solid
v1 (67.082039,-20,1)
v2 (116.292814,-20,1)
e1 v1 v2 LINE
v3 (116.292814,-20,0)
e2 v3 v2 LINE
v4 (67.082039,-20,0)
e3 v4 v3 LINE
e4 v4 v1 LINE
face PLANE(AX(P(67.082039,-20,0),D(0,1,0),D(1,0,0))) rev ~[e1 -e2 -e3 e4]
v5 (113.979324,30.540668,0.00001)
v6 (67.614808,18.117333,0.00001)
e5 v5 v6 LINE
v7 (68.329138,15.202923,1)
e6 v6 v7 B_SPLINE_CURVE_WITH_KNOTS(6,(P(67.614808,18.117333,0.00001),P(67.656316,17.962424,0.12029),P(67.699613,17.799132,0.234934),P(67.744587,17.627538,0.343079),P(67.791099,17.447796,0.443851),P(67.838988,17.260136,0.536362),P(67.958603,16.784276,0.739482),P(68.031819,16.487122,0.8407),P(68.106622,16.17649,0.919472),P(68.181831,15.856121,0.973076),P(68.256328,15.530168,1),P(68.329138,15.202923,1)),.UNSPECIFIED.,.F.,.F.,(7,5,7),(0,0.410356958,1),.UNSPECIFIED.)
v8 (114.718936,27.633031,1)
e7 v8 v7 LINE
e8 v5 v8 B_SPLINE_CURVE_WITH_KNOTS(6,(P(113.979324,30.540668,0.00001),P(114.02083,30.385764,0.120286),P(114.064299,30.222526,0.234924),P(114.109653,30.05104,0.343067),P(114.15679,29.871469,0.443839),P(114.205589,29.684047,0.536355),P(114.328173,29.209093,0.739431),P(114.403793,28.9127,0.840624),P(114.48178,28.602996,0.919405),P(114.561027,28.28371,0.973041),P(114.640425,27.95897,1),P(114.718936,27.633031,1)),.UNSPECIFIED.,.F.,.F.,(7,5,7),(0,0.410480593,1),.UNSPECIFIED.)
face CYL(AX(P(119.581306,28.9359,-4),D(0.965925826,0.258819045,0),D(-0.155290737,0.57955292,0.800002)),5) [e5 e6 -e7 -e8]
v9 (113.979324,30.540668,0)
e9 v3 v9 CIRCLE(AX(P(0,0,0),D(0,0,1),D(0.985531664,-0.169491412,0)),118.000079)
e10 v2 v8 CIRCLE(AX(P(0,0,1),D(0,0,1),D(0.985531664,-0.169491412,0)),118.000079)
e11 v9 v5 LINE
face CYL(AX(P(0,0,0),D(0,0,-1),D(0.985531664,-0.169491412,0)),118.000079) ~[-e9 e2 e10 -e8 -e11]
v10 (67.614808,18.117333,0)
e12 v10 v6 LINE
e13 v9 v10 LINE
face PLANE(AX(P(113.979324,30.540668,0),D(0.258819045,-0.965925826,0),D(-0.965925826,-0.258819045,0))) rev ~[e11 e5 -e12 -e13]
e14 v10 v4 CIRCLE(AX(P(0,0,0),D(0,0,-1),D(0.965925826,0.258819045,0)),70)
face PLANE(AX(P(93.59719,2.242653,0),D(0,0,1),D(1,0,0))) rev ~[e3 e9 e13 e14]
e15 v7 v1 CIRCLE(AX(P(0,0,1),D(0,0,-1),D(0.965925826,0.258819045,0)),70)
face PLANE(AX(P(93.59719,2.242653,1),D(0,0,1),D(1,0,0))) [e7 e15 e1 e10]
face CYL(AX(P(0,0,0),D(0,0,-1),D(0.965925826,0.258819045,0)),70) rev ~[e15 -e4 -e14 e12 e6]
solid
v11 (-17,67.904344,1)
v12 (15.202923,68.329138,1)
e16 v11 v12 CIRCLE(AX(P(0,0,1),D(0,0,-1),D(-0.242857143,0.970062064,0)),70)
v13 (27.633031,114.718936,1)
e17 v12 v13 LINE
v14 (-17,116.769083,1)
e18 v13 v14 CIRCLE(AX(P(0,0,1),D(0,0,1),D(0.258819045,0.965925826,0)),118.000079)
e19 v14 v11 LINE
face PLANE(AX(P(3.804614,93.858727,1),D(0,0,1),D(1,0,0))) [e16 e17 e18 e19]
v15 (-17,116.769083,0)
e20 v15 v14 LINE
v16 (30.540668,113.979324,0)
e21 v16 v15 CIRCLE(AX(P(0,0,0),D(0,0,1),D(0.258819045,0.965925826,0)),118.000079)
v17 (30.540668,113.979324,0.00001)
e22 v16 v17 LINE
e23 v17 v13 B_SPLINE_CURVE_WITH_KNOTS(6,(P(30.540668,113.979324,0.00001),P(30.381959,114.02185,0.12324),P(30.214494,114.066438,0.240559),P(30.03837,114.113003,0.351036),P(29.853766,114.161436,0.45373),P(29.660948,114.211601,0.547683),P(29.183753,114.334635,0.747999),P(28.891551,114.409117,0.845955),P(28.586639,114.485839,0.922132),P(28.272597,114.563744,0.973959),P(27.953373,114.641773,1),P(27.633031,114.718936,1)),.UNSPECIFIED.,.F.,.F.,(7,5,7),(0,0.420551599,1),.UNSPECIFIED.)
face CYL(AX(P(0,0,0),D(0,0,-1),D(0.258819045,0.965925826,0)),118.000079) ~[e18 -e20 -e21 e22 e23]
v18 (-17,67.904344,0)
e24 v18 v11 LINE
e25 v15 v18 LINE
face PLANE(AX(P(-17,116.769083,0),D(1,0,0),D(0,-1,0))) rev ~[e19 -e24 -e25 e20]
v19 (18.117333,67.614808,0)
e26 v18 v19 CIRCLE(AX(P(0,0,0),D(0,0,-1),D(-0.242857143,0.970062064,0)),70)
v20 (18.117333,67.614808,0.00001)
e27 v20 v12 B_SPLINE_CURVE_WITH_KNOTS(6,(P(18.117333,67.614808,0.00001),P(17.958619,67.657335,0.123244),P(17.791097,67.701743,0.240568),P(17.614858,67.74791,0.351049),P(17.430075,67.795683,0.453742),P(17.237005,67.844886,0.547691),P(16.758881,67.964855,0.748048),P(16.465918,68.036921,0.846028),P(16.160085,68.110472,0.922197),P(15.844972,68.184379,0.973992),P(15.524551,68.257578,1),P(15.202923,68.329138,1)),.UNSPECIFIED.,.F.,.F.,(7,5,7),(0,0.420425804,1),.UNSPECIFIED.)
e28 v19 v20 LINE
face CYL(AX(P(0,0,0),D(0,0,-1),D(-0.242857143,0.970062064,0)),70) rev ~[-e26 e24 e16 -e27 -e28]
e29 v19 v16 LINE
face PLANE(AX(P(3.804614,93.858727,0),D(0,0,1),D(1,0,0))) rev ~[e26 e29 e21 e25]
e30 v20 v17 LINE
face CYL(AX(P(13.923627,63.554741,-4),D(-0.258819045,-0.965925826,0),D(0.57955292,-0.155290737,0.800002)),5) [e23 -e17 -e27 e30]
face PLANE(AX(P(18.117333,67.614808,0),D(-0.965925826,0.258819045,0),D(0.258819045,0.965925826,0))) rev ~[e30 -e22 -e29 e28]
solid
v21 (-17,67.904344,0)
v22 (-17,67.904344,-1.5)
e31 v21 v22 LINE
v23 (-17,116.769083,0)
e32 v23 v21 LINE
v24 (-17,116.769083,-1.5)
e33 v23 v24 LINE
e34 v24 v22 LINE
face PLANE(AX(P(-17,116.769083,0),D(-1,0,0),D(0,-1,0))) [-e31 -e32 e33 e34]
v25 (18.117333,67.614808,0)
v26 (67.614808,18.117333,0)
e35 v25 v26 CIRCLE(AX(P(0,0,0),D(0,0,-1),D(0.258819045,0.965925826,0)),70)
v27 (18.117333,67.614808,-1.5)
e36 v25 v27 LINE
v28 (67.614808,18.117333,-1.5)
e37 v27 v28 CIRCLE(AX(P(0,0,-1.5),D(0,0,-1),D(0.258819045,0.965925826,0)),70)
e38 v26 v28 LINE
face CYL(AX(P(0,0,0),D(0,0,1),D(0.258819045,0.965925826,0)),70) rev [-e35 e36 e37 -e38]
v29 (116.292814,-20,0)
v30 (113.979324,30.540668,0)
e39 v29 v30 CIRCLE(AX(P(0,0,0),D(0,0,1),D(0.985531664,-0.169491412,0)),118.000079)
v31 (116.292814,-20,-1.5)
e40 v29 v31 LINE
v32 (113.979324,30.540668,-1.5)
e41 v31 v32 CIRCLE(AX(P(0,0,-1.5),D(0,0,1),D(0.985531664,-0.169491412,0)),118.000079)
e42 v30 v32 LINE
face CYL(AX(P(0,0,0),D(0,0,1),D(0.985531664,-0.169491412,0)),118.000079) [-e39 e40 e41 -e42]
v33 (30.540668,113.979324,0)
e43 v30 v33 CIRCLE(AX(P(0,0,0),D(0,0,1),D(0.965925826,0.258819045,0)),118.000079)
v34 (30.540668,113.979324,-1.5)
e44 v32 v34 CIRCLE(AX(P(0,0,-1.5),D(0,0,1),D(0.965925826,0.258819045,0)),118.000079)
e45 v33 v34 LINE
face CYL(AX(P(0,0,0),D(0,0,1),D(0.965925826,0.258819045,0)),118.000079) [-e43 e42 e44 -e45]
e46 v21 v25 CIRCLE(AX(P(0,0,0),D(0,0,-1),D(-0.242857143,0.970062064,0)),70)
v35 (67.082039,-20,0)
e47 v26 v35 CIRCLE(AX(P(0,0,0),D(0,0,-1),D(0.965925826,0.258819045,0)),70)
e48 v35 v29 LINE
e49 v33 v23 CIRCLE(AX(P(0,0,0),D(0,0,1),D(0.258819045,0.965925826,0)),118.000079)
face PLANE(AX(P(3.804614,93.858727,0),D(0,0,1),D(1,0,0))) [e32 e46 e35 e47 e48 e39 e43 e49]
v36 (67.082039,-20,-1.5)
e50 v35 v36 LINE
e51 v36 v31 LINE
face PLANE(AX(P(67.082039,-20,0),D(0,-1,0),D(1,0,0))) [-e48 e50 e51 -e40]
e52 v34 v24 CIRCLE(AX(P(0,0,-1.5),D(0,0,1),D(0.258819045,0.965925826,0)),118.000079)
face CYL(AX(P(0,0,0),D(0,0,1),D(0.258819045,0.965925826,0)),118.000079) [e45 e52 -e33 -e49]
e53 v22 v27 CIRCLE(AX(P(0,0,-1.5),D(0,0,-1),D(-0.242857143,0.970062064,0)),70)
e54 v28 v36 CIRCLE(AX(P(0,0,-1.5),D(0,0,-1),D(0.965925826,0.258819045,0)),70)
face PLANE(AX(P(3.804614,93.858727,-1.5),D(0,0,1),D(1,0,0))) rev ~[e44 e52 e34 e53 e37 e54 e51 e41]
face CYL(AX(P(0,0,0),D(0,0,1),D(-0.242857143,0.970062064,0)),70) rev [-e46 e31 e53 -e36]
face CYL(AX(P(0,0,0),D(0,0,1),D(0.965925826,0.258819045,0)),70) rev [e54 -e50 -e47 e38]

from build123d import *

# Parameters (mm, degrees)
F1_DEPTH      = 1
F2_DEPTH      = 1.5
F3_SIZE       = 0.99999
F3_2_SIZE     = 0.99999
F4_T1_DEPTH   = 58.00296827
F4_2_T1_DEPTH = 58.00296827


# Not quite as in the source:
# - a fillet or chamfer that OpenCascade refuses, or shapes differently, is made with other operations: its cross-section is extruded or revolved along the edge and cut away or added
# - a fillet or chamfer is up to 0.001 mm smaller than in the source, because OpenCascade refuses the exact size


with BuildPart() as f1:
    # F0 (on Top) → F1 (new body)
    with BuildSketch(Plane.XY):
        with BuildLine():
            ThreePointArc((-17, 67.9043444855), (0.5771188901, 69.9976209152), (18.1173331572, 67.6148078402))
            Line((18.1173331572, 67.6148078402), (30.5406678037, 113.9793239405))
            ThreePointArc((30.5406678037, 113.9793239405), (6.9125327944, 117.7974344635), (-17, 116.7690827053))
            Line((-17, 116.7690827053), (-17, 67.9043444855))
        make_face()
    extrude(amount=F1_DEPTH)

    # F3 (size 1 in the source; OpenCascade refuses exactly that, so slightly less here)
    f3_edges = [f1.edges().sort_by_distance(p)[0] for p in [
        (24.329, 90.797066, 1),
    ]]
    chamfer(f3_edges, length=F3_SIZE)

    # F4: fillet of radius 5 on 1 edges, made by hand

    # F4_s2 → F4_t1 (cut)
    with BuildSketch(Plane(origin=(16.8213913237, 62.778287074, 0), x_dir=(0, 0, 1), z_dir=(0.2588190451, 0.9659258263, 0))):
        with BuildLine():
            ThreePointArc((1e-05, 0), (0.7434191255, -1.4188557423), (1, -2.9999866666))
            Line((1, -2.9999866666), (1, -0.99999))
            Line((1, -0.99999), (1e-05, 0))
        make_face()
    extrude(amount=F4_T1_DEPTH, mode=Mode.SUBTRACT)


with BuildPart() as f1b:
    # F0 (on Top) → F1, piece 2 (new body)
    with BuildSketch(Plane.XY):
        with BuildLine():
            ThreePointArc((67.6148078402, 18.1173331572), (69.9931634577, -0.9782991276), (67.082039325, -20))
            Line((67.082039325, -20), (116.2928143774, -20))
            ThreePointArc((116.2928143774, -20), (117.8766482255, 5.3957834406), (113.9793239405, 30.5406678037))
            Line((113.9793239405, 30.5406678037), (67.6148078402, 18.1173331572))
        make_face()
    extrude(amount=F1_DEPTH)

    # F3#2 (size 1 in the source; OpenCascade refuses exactly that, so slightly less here)
    f3_2_edges = [f1b.edges().sort_by_distance(p)[0] for p in [
        (90.797066, 24.329, 1),
    ]]
    chamfer(f3_2_edges, length=F3_2_SIZE)

    # F4#2: fillet of radius 5 on 1 edges, made by hand

    # F4_2_s2 → F4_2_t1 (cut)
    with BuildSketch(Plane(origin=(118.8048521275, 31.8336641845, 0), x_dir=(0, 0, 1), z_dir=(-0.9659258263, -0.2588190451, 0))):
        with BuildLine():
            ThreePointArc((1e-05, 0), (0.7434191255, -1.4188557423), (1, -2.9999866666))
            Line((1, -2.9999866666), (1, -0.99999))
            Line((1, -0.99999), (1e-05, 0))
        make_face()
    extrude(amount=F4_2_T1_DEPTH, mode=Mode.SUBTRACT)


with BuildPart() as f2:
    # F0 (on Top) → F2 (new body)
    with BuildSketch(Plane.XY):
        with BuildLine():
            ThreePointArc((-17, 67.9043444855), (0.5771188901, 69.9976209152), (18.1173331572, 67.6148078402))
            Line((18.1173331572, 67.6148078402), (30.5406678037, 113.9793239405))
            ThreePointArc((30.5406678037, 113.9793239405), (6.9125327944, 117.7974344635), (-17, 116.7690827053))
            Line((-17, 116.7690827053), (-17, 67.9043444855))
        make_face()
        with BuildLine():
            ThreePointArc((18.1173331572, 67.6148078402), (49.4974746831, 49.4974746831), (67.6148078402, 18.1173331572))
            Line((67.6148078402, 18.1173331572), (113.9793239405, 30.5406678037))
            ThreePointArc((113.9793239405, 30.5406678037), (83.4386561368, 83.4386561368), (30.5406678037, 113.9793239405))
            Line((30.5406678037, 113.9793239405), (18.1173331572, 67.6148078402))
        make_face()
        with BuildLine():
            ThreePointArc((67.6148078402, 18.1173331572), (69.9931634577, -0.9782991276), (67.082039325, -20))
            Line((67.082039325, -20), (116.2928143774, -20))
            ThreePointArc((116.2928143774, -20), (117.8766482255, 5.3957834406), (113.9793239405, 30.5406678037))
            Line((113.9793239405, 30.5406678037), (67.6148078402, 18.1173331572))
        make_face()
    extrude(amount=-F2_DEPTH)


solid = Compound([f1.part, f1b.part, f2.part])
